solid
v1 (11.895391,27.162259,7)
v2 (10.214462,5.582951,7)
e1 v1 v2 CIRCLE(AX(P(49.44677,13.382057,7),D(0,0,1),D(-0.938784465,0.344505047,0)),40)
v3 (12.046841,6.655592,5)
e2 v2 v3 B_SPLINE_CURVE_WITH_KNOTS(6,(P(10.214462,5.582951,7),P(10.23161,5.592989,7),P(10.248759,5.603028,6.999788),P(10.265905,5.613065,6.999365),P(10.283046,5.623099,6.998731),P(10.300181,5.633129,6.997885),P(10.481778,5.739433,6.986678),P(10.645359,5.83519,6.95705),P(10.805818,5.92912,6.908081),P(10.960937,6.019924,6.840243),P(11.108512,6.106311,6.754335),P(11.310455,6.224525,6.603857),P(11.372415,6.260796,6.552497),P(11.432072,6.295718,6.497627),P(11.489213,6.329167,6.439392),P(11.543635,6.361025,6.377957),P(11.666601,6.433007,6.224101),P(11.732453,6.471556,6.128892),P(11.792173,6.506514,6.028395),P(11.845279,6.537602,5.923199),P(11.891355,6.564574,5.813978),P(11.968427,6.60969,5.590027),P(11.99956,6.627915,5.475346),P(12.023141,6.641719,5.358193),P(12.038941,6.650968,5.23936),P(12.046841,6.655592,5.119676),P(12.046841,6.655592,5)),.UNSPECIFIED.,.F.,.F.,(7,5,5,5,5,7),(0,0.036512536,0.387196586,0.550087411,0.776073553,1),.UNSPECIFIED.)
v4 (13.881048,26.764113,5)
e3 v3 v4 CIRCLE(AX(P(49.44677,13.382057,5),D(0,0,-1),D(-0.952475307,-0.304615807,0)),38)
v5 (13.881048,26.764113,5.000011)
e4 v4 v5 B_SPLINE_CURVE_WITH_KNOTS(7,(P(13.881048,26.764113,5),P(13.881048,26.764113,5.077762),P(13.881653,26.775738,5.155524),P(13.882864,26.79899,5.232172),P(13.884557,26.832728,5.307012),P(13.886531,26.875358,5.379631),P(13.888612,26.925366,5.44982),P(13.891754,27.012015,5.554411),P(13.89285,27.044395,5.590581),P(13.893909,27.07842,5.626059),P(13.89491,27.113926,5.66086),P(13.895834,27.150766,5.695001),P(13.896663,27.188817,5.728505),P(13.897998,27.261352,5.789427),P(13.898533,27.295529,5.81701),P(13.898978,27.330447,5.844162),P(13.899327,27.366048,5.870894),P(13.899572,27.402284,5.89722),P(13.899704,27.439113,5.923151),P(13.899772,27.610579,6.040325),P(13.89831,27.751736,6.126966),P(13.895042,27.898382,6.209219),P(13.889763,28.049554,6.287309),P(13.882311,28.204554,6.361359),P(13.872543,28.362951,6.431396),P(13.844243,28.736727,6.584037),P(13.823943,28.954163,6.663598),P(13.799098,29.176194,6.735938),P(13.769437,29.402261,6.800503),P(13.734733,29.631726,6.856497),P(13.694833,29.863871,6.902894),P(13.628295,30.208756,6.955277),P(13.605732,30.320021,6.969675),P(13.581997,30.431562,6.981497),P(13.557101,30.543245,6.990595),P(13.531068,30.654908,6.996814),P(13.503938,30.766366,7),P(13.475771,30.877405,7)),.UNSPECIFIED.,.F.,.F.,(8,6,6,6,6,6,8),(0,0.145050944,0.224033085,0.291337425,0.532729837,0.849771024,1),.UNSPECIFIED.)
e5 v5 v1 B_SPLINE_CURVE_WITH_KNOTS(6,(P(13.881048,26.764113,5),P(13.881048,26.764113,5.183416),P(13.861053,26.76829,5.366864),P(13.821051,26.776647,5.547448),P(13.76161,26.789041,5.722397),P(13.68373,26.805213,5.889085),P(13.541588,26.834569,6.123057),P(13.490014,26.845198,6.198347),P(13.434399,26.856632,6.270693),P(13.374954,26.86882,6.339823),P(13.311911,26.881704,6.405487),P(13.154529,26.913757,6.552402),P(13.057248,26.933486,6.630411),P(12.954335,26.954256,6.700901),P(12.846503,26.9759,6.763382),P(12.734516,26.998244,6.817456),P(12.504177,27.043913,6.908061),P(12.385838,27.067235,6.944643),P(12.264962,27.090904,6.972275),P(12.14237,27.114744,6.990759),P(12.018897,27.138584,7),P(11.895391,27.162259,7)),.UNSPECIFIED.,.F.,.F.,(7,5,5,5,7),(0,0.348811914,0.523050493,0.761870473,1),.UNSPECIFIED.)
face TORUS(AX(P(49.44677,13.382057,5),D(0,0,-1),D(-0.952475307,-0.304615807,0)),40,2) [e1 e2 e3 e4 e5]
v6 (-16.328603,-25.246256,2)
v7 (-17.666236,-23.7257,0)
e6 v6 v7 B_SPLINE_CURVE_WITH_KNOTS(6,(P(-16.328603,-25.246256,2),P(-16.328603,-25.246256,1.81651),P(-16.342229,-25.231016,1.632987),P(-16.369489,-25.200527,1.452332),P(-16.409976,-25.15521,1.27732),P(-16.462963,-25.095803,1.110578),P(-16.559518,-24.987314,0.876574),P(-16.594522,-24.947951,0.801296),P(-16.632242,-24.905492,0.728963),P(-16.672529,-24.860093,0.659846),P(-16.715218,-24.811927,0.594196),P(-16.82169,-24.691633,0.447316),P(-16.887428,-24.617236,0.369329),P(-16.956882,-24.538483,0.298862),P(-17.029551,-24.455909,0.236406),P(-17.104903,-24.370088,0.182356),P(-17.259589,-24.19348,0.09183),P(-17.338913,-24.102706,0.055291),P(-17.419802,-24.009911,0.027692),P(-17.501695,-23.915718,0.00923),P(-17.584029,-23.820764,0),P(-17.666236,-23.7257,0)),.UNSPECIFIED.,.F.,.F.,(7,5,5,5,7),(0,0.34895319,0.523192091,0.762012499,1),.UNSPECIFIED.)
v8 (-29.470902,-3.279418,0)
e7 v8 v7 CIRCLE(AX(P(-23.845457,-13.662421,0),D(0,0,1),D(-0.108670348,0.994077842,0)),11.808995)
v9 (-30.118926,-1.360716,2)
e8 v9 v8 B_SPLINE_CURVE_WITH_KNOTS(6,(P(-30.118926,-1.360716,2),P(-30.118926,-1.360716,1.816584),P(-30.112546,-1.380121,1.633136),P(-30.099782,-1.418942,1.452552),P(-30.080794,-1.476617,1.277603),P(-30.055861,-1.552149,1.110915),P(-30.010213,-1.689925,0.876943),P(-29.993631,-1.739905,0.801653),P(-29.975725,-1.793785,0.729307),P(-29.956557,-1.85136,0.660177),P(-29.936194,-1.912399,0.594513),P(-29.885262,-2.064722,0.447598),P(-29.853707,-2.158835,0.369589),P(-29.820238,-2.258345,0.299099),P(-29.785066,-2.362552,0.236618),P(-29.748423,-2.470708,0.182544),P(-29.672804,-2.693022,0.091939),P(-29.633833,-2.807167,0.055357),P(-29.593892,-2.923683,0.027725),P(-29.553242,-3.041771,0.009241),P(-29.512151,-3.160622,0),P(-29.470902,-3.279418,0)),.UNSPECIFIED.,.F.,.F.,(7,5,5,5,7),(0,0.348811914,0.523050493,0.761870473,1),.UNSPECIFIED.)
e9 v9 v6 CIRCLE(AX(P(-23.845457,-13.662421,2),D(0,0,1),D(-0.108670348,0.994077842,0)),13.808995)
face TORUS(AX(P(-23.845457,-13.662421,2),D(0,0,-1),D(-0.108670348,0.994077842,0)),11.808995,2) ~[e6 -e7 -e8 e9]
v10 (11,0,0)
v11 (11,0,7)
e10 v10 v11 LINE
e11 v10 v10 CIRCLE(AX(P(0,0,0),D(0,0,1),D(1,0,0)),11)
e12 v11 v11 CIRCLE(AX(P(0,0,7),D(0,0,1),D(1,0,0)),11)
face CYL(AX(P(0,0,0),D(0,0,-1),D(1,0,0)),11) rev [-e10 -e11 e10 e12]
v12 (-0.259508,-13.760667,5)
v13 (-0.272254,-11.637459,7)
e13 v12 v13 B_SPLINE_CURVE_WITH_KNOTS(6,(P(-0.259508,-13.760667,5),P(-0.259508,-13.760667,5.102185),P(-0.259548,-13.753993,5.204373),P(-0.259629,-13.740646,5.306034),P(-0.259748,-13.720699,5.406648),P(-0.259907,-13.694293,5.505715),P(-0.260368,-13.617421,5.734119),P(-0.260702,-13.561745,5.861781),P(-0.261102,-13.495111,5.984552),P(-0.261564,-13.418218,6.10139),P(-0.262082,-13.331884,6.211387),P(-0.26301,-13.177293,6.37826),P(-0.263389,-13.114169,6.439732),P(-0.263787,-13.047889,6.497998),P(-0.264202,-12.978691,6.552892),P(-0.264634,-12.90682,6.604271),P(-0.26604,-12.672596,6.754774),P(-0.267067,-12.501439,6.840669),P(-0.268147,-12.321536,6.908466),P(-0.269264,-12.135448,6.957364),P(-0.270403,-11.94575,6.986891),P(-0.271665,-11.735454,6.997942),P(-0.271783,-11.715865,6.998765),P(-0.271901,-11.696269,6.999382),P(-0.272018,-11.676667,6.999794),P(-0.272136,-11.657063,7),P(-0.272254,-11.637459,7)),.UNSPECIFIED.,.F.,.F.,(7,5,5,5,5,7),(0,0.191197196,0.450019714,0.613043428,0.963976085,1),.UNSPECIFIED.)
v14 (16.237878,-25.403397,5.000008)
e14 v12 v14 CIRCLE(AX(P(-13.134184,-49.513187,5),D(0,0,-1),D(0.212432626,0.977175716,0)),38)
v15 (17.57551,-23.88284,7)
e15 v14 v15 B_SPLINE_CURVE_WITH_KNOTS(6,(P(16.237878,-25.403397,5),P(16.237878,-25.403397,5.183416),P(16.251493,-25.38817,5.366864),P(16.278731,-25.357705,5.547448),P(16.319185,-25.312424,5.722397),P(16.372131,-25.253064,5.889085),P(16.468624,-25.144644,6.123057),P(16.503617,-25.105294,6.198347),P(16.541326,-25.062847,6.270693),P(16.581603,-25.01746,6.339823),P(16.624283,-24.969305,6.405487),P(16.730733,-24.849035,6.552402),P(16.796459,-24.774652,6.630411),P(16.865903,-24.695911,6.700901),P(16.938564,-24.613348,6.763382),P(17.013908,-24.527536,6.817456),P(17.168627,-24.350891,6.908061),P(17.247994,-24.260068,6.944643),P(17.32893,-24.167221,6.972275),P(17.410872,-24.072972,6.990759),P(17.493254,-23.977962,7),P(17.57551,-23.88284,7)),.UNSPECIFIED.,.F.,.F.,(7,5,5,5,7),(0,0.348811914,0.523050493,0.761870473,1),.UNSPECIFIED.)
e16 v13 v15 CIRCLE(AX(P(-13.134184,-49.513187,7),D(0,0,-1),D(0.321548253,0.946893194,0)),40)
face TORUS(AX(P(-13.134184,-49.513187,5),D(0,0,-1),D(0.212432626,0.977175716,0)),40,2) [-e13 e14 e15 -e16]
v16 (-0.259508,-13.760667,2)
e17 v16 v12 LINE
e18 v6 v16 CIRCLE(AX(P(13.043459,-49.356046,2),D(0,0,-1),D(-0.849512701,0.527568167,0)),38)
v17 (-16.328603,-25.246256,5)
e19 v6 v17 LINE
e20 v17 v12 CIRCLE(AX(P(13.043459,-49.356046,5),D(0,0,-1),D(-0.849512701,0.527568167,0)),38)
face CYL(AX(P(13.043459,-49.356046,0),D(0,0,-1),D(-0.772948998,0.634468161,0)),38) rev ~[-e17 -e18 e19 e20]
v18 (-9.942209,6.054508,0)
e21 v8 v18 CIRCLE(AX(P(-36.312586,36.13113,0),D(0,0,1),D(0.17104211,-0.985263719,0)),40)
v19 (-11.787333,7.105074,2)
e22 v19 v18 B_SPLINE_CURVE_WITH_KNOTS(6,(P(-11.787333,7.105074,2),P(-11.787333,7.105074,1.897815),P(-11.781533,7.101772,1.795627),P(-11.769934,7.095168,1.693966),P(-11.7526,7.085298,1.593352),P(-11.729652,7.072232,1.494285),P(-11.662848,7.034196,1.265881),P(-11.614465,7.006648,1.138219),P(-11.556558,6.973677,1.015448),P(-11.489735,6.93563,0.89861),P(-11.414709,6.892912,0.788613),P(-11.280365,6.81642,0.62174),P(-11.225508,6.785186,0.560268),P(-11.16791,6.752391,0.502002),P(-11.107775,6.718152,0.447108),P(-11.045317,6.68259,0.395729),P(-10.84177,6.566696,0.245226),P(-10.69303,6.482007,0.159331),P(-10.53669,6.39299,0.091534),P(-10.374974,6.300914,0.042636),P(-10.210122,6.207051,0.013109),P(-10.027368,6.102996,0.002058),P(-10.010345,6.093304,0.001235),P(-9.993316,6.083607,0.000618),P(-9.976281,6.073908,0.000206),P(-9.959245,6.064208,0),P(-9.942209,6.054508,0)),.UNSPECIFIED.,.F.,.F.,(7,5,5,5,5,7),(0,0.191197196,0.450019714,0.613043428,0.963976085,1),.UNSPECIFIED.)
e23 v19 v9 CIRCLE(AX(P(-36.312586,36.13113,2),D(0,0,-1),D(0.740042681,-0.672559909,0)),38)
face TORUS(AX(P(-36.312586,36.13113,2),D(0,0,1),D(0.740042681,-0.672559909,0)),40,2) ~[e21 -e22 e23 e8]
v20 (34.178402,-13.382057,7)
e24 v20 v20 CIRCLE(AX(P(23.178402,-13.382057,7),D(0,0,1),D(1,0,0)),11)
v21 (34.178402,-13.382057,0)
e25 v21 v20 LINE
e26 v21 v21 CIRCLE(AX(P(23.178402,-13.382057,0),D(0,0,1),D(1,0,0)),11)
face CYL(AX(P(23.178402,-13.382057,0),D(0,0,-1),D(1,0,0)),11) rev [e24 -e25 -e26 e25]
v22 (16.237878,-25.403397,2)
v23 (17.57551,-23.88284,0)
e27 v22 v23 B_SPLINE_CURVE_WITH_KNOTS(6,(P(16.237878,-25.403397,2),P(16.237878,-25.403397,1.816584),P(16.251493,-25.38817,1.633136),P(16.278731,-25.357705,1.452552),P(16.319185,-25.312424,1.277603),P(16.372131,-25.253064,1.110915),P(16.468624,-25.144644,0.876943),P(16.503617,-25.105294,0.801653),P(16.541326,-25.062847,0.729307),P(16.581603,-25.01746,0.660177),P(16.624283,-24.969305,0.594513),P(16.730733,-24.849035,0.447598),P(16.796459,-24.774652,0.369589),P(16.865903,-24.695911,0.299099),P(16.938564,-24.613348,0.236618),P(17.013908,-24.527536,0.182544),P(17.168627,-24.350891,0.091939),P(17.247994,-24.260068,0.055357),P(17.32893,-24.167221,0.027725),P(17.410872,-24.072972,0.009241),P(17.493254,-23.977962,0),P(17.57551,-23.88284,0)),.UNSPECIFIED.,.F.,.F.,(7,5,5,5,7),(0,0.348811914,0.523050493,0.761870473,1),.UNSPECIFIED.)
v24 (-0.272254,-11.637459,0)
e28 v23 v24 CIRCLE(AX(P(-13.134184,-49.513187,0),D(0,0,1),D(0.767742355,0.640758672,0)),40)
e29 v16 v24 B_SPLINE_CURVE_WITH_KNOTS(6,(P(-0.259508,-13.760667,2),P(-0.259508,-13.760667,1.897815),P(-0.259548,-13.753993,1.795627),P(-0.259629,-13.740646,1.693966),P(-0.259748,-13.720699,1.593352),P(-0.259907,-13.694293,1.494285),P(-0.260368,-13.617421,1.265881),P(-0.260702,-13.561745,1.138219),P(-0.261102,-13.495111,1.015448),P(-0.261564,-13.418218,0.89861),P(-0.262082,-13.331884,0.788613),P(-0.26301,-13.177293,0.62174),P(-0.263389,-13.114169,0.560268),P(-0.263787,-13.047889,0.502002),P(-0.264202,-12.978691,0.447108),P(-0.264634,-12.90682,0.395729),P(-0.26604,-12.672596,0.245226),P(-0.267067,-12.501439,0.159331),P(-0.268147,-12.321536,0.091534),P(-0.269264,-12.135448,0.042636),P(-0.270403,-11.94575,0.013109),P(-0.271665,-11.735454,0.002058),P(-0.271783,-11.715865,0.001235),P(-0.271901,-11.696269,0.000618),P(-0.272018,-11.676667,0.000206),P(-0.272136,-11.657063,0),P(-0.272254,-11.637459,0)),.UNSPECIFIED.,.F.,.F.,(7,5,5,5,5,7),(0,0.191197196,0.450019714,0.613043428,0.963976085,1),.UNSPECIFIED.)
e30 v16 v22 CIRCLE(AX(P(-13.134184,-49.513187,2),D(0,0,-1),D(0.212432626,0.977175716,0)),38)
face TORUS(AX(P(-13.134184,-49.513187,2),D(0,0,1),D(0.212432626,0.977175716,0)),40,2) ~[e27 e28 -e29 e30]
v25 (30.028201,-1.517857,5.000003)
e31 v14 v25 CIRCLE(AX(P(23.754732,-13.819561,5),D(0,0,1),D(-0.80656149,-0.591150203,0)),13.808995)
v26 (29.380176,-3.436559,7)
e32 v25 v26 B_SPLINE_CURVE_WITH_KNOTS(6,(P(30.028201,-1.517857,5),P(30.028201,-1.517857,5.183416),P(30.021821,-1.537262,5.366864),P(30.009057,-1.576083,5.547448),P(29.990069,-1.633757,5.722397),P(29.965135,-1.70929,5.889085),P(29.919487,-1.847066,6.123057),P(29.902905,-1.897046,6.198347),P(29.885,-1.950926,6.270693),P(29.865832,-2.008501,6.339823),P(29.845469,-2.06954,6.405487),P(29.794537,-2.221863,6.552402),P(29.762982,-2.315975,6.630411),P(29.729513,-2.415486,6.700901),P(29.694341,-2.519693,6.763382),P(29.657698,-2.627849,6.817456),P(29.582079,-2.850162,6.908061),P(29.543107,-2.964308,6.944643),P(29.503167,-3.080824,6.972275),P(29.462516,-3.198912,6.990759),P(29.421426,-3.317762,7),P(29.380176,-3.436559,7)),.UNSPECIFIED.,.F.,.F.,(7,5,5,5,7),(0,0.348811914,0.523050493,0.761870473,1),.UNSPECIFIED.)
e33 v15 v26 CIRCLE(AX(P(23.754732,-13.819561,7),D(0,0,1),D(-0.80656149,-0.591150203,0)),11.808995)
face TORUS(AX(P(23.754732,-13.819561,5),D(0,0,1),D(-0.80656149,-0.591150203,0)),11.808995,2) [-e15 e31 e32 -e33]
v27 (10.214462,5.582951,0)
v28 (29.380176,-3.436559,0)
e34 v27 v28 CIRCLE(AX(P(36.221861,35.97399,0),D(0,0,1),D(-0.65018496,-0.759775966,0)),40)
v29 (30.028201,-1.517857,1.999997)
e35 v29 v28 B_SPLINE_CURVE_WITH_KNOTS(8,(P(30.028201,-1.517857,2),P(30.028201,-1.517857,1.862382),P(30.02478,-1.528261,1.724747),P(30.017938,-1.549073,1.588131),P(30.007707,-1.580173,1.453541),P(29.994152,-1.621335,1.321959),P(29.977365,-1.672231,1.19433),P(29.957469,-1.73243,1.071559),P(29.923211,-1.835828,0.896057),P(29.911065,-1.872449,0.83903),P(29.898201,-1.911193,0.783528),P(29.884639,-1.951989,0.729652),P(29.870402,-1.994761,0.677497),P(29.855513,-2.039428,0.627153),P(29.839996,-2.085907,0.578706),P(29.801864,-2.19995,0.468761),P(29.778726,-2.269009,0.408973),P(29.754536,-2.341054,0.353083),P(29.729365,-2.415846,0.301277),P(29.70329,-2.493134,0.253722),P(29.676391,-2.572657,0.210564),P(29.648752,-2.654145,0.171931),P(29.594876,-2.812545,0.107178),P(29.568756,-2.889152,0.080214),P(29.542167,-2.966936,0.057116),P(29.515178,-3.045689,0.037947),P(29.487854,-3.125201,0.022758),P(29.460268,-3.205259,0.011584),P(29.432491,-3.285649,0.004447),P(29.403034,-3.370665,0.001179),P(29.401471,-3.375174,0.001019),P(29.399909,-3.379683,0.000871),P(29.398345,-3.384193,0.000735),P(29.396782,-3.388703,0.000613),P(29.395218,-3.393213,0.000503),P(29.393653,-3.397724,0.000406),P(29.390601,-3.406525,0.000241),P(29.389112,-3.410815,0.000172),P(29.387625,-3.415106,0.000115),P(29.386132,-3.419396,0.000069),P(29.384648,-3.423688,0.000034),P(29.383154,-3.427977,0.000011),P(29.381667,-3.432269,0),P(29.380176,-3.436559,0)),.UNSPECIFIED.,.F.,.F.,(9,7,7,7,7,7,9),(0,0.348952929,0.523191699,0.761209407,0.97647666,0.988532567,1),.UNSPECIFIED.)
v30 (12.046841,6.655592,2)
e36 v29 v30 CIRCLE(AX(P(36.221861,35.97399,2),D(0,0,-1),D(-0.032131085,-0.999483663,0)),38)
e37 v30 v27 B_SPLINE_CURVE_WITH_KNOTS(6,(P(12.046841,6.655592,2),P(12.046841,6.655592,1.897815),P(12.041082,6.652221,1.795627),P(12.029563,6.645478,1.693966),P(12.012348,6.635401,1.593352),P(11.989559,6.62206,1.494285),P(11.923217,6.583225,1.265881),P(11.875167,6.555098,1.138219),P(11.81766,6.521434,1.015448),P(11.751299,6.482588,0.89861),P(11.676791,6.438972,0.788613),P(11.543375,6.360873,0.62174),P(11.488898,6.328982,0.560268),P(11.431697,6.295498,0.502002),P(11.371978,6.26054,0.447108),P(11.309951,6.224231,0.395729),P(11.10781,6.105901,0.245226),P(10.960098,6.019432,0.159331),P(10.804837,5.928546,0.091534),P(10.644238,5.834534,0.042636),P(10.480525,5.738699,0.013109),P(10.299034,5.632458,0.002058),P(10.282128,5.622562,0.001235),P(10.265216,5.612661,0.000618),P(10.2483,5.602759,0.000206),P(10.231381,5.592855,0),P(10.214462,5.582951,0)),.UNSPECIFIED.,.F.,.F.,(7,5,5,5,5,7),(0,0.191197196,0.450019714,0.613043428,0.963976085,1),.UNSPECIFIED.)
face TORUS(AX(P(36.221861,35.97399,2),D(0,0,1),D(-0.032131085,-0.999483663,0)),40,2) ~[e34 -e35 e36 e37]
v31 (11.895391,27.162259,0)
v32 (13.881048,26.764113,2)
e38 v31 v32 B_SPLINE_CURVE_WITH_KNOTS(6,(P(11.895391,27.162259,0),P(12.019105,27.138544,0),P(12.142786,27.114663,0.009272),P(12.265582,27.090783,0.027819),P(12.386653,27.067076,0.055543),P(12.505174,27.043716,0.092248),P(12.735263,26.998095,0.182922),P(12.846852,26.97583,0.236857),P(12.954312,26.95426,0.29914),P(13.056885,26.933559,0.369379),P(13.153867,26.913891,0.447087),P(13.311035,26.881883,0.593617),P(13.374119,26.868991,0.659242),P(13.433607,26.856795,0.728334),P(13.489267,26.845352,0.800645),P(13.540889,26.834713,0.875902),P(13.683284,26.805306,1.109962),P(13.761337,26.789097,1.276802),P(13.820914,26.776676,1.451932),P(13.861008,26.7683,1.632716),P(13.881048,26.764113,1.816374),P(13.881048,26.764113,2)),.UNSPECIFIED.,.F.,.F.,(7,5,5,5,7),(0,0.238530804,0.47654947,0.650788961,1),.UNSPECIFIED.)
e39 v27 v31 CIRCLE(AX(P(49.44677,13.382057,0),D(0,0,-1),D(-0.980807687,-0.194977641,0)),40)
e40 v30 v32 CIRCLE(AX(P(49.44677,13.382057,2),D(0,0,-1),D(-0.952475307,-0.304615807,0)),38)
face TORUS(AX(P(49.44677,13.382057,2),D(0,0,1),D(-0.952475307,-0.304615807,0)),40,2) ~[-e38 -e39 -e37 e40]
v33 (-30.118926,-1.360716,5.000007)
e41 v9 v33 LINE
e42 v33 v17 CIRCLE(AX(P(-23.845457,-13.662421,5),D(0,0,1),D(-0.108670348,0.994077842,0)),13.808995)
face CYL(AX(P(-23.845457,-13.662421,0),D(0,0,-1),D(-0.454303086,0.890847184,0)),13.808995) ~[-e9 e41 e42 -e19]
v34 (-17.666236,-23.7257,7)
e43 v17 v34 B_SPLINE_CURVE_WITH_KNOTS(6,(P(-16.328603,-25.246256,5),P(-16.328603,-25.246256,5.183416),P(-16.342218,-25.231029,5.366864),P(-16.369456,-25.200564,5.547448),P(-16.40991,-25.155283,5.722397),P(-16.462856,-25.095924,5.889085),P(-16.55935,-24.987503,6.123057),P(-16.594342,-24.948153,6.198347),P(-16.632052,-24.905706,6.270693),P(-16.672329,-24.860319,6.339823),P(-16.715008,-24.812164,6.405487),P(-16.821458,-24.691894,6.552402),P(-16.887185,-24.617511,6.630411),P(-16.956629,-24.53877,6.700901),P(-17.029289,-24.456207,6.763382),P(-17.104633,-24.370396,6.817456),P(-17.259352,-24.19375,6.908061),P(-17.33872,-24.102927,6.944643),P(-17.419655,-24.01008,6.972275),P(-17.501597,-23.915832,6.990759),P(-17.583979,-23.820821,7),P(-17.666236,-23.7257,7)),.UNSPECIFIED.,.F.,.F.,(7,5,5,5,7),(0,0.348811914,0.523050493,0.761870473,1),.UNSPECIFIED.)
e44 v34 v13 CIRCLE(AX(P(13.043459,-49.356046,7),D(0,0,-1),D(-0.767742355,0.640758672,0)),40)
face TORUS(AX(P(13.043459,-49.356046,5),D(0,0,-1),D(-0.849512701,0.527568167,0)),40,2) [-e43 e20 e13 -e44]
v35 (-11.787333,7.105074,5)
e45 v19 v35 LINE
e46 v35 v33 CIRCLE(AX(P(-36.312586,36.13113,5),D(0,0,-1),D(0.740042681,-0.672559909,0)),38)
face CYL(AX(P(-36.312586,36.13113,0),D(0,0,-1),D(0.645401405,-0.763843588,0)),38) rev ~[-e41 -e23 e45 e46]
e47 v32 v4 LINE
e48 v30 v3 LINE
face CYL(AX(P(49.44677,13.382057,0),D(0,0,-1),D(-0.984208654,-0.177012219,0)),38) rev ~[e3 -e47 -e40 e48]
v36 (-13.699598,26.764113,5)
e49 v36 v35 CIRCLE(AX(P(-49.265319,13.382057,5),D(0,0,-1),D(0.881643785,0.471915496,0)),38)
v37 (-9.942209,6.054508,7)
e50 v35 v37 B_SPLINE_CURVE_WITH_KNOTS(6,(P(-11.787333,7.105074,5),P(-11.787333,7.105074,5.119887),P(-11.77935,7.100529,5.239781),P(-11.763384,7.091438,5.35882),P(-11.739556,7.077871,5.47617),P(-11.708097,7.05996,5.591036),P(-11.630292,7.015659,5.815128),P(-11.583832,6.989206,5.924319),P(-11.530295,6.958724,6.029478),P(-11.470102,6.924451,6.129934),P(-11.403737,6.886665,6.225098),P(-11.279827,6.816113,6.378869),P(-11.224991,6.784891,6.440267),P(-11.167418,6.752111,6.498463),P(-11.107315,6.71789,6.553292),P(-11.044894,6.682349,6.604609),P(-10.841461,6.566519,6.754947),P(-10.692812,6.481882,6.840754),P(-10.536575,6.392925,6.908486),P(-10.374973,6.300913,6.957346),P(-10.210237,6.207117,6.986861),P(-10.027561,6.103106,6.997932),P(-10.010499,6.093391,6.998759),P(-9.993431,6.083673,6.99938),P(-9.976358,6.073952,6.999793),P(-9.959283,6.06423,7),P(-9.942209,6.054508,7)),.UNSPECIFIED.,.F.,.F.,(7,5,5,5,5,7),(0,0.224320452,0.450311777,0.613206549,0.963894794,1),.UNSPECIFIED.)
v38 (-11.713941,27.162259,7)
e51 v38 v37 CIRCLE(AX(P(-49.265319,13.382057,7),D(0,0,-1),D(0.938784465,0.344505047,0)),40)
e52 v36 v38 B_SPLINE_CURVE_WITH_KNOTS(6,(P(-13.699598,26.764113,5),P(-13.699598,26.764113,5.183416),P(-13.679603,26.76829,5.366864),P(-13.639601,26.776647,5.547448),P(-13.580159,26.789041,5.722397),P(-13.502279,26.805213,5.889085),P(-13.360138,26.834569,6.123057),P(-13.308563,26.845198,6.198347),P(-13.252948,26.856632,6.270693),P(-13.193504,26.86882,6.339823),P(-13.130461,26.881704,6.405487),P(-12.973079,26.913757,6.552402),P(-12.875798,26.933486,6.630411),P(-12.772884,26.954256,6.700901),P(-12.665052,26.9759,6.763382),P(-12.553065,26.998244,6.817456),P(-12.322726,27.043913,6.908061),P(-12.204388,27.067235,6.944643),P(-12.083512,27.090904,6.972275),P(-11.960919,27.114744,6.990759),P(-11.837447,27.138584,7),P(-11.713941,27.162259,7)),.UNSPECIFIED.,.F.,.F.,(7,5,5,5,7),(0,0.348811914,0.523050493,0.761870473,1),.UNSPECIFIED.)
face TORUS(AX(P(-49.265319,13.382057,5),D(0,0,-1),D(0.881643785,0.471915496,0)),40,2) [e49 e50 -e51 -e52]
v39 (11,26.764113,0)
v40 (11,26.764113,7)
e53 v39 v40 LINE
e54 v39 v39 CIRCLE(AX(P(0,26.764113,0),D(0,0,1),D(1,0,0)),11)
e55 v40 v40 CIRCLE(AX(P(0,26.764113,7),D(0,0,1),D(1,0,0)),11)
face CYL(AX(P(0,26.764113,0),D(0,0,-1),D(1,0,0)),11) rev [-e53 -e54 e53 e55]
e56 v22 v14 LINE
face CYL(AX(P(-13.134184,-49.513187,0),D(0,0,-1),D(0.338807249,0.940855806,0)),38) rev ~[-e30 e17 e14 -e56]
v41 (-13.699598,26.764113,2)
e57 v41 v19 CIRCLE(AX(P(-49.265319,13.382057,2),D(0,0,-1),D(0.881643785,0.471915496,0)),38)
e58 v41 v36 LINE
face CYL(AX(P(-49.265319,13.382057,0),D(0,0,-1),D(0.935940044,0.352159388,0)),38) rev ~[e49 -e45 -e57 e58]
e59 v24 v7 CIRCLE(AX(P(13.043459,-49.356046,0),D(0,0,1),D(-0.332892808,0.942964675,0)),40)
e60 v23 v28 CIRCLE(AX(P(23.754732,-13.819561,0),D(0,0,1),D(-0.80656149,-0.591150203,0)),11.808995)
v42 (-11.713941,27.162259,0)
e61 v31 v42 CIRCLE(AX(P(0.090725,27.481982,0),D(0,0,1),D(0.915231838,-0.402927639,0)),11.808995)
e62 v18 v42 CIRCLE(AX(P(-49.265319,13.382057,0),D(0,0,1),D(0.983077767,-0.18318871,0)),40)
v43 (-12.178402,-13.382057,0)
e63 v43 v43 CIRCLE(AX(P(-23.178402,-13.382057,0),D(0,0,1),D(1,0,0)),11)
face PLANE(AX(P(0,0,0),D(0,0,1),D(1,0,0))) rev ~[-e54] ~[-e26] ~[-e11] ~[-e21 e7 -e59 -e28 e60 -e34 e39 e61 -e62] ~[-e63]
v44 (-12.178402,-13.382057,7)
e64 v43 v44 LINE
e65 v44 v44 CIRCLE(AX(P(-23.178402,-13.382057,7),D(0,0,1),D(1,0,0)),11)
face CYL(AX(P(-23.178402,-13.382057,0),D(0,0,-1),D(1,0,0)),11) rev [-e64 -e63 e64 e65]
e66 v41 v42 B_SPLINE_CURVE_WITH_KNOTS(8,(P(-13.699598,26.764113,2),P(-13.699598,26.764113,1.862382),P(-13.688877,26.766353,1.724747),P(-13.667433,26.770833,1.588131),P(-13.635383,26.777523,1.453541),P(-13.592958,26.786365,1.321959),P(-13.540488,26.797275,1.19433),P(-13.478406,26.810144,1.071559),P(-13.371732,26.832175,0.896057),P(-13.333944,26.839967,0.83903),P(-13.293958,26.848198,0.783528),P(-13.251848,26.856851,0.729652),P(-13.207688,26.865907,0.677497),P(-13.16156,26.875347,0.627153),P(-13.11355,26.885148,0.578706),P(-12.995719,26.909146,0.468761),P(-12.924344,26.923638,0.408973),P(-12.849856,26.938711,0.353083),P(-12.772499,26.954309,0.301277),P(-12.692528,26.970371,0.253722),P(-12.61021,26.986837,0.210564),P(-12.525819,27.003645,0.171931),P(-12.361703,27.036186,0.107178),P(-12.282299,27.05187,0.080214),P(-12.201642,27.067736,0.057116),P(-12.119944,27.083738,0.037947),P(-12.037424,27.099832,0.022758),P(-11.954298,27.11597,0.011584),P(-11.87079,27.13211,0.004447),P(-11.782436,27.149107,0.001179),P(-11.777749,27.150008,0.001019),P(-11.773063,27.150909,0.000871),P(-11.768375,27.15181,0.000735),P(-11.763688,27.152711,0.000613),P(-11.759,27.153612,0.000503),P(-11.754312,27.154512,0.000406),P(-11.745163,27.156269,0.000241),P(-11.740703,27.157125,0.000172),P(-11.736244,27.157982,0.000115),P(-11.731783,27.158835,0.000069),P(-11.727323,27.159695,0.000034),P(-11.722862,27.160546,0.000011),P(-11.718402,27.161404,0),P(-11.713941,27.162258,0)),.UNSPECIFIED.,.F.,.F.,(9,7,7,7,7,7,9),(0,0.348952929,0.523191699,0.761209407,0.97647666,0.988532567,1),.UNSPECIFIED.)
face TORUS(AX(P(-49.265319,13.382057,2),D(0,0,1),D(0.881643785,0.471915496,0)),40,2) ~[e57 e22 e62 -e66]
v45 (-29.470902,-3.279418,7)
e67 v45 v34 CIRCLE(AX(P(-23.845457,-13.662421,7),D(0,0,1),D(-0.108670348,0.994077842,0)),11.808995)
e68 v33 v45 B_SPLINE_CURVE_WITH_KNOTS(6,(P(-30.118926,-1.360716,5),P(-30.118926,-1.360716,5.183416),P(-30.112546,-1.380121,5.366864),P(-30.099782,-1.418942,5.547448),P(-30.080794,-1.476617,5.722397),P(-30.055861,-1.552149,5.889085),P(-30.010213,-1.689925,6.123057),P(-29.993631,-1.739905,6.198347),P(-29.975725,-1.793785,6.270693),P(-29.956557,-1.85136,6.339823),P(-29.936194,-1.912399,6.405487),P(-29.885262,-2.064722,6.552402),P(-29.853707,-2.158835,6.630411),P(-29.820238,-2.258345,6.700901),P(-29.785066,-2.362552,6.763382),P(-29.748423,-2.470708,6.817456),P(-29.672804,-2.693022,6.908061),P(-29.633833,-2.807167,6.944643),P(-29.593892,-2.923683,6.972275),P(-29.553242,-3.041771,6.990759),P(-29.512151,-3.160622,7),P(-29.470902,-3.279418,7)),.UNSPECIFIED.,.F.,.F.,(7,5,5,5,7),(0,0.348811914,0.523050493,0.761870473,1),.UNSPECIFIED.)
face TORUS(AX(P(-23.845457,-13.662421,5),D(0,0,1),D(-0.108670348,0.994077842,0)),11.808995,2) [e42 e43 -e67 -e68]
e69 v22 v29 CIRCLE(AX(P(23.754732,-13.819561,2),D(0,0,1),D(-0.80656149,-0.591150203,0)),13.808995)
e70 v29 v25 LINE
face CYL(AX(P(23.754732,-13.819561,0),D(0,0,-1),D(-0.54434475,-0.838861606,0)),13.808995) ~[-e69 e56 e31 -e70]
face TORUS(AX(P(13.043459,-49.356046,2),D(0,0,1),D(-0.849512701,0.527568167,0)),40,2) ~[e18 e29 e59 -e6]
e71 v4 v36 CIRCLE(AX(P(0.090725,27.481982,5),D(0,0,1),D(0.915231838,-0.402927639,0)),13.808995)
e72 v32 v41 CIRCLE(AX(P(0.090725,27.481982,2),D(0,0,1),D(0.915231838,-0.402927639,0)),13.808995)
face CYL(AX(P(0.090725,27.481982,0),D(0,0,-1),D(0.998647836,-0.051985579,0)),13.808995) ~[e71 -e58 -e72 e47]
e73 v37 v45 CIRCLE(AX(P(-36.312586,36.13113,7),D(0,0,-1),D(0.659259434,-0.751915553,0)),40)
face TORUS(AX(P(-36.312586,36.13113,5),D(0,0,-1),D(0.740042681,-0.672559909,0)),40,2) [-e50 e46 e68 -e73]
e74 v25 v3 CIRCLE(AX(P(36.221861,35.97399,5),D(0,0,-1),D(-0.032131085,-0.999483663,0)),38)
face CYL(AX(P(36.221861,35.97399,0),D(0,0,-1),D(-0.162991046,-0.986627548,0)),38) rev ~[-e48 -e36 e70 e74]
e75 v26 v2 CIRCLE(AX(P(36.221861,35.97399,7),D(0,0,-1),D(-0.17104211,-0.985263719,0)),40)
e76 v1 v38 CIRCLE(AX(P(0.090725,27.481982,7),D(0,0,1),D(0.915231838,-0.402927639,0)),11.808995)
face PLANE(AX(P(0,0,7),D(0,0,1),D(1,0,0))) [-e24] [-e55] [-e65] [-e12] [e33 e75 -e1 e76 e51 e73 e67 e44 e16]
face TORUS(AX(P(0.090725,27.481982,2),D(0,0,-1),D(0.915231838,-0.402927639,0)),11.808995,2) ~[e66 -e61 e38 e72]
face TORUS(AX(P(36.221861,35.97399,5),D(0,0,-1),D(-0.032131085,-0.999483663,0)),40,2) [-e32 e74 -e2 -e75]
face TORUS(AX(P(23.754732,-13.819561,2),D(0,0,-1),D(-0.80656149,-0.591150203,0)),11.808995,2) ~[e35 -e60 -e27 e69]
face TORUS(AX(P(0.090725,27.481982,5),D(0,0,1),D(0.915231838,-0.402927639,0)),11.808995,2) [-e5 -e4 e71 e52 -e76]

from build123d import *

# Parameters (mm, degrees)
F0_R         = 11
F1_DEPTH     = 7
F2_T3_ANGLE  = 45.2058743493
F2_S4_R      = 38
F2_T5_DEPTH  = 19
F2_T8_ANGLE  = 227.522654694
F2_T11_ANGLE = 45.8937746322
F2_S12_R     = 38
F2_T13_DEPTH = 20
F2_T16_ANGLE = 45.2058743493
F2_S17_R     = 38
F2_T18_DEPTH = 20
F2_T21_ANGLE = 227.522654694
F2_T24_ANGLE = 45.8937746322
F2_S25_R     = 38
F2_T26_DEPTH = 21
F2_T29_ANGLE = 45.2058743493
F2_S30_R     = 38
F2_T31_DEPTH = 21
F2_T34_ANGLE = 227.522654694
F2_T37_ANGLE = 45.8937746322
F2_S38_R     = 38
F2_T39_DEPTH = 20
F2_T43_ANGLE = 45.2058743493
F2_S44_R     = 38
F2_T45_DEPTH = 19
F2_T48_ANGLE = 45.8937746322
F2_S49_R     = 38
F2_T50_DEPTH = 20
F2_T55_ANGLE = 45.8937746322
F2_S56_R     = 38
F2_T57_DEPTH = 20
F2_T60_ANGLE = 45.2058743493
F2_S61_R     = 38
F2_T62_DEPTH = 20
F2_T67_ANGLE = 45.2058743493
F2_S68_R     = 38
F2_T69_DEPTH = 21
F2_T72_ANGLE = 45.8937746322
F2_S73_R     = 38
F2_T74_DEPTH = 21
F3_T3_ANGLE  = 227.522654694
F3_T6_ANGLE  = 45.2058743493
F3_S7_R      = 38
F3_T8_DEPTH  = 19
F3_T11_ANGLE = 45.8937746322
F3_S12_R     = 38
F3_T13_DEPTH = 20
F3_T16_ANGLE = 227.522654694
F3_T19_ANGLE = 45.2058743493
F3_S20_R     = 38
F3_T21_DEPTH = 21
F3_T24_ANGLE = 45.8937746322
F3_S25_R     = 38
F3_T26_DEPTH = 21
F3_T29_ANGLE = 227.522654694
F3_T32_ANGLE = 45.2058743493
F3_S33_R     = 38
F3_T34_DEPTH = 20
F3_T37_ANGLE = 45.8937746322
F3_S38_R     = 38
F3_T39_DEPTH = 20
F3_T43_ANGLE = 45.8937746322
F3_S44_R     = 38
F3_T45_DEPTH = 20
F3_T48_ANGLE = 45.2058743493
F3_S49_R     = 38
F3_T50_DEPTH = 19
F3_T55_ANGLE = 45.8937746322
F3_S56_R     = 38
F3_T57_DEPTH = 21
F3_T60_ANGLE = 45.2058743493
F3_S61_R     = 38
F3_T62_DEPTH = 21
F3_T67_ANGLE = 45.8937746322
F3_S68_R     = 38
F3_T69_DEPTH = 20
F3_T72_ANGLE = 45.2058743493
F3_S73_R     = 38
F3_T74_DEPTH = 20


# Not quite as in the source:
# - a fillet or chamfer that OpenCascade refuses, or shapes differently, is made with other operations: its cross-section is extruded or revolved along the edge and cut away or added


with BuildPart() as f1:
    # F0 (on Top) → F1 (new body)
    with BuildSketch(Plane.XY):
        with BuildLine():
            ThreePointArc((12.0468410067, 6.6555924166), (11.6038749685, 16.833912258), (13.8810481876, 26.764113456))
            ThreePointArc((13.8810481876, 26.764113456), (0.0907252543, 41.2909770134), (-13.6995976791, 26.764113456))
            ThreePointArc((-13.6995976791, 26.764113456), (-11.4438268991, 17.0610116136), (-11.7873326133, 7.1050741388))
            ThreePointArc((-11.7873326133, 7.1050741388), (-20.3805331447, 1.6322943761), (-30.1189262565, -1.3607163664))
            ThreePointArc((-30.1189262565, -1.3607163664), (-35.8043976678, -20.5669181317), (-16.3286033231, -25.2462563397))
            ThreePointArc((-16.3286033231, -25.2462563397), (-9.053356022, -18.4411506179), (-0.2595083933, -13.7606665554))
            ThreePointArc((-0.2595083933, -13.7606665554), (8.7766581762, -18.466206634), (16.2378780689, -25.4033970896))
            ThreePointArc((16.2378780689, -25.4033970896), (35.7136724135, -20.7240588817), (30.0282010022, -1.5178571163))
            ThreePointArc((30.0282010022, -1.5178571163), (20.4971829212, 1.3801390044), (12.0468410067, 6.6555924166))
        make_face()
        with Locations((-23.1784021627, -13.382056728)):
            Circle(F0_R, mode=Mode.SUBTRACT)
        with Locations((23.1784021627, -13.382056728)):
            Circle(F0_R, mode=Mode.SUBTRACT)
        Circle(F0_R, mode=Mode.SUBTRACT)
        with Locations((0, 26.764113456)):
            Circle(F0_R, mode=Mode.SUBTRACT)
    extrude(amount=F1_DEPTH)

    # F2: fillet of radius 2 on 9 edges, made by hand


with BuildPart() as f2_tool1:
    # F2_s2 → F2_t3 (revolve)
    with BuildSketch(Plane(origin=(-16.5393520653, 30.8992120032, 0), x_dir=(0, 0, 1), z_dir=(-0.4719154962, 0.8816437855, 0))):
        with BuildLine():
            ThreePointArc((5, 0.8807372995), (6.4142135624, 1.4665237371), (7, 2.8807372995))
            Line((7, 2.8807372995), (7, 0.8807372995))
            Line((7, 0.8807372995), (5, 0.8807372995))
        make_face()
    revolve(axis=Axis((-49.2653193466, 13.382056728, 7), (0, 0, -1)), revolution_arc=F2_T3_ANGLE)

    # F2_s4 → F2_t5 (intersect, symmetric)
    with BuildSketch(Plane.XY.offset(5.3)):
        with Locations((-36.3125860089, 36.1311304656)):
            Circle(F2_S4_R)
    extrude(amount=F2_T5_DEPTH, both=True, mode=Mode.INTERSECT)


with BuildPart() as f2_tool6:
    # F2_s7 → F2_t8 (revolve)
    with BuildSketch(Plane(origin=(10.1493203818, 23.0537204739, 0), x_dir=(0, 0, 1), z_dir=(-0.4029276386, -0.9152318384, 0))):
        with BuildLine():
            ThreePointArc((5, -2.8187794742), (6.4142135624, -2.2329930365), (7, -0.8187794742))
            Line((7, -0.8187794742), (7, -2.8187794742))
            Line((7, -2.8187794742), (5, -2.8187794742))
        make_face()
    revolve(axis=Axis((0.0907252543, 27.4819820491, 7), (0, 0, 1)), revolution_arc=F2_T8_ANGLE)


with BuildPart() as f2_tool9:
    # F2_s10 → F2_t11 (revolve)
    with BuildSketch(Plane(origin=(0.7055478119, -2.2061129258, 0), x_dir=(0, 0, 1), z_dir=(0.3046158068, -0.9524753069, 0))):
        with BuildLine():
            ThreePointArc((5, -13.1732132997), (6.4142135624, -12.5874268621), (7, -11.1732132997))
            Line((7, -11.1732132997), (7, -13.1732132997))
            Line((7, -13.1732132997), (5, -13.1732132997))
        make_face()
    revolve(axis=Axis((49.4467698551, 13.382056728, 7), (0, 0, -1)), revolution_arc=F2_T11_ANGLE)

    # F2_s12 → F2_t13 (intersect, symmetric)
    with BuildSketch(Plane.XY.offset(5.3)):
        with Locations((36.2218607546, 35.9739897157)):
            Circle(F2_S12_R)
    extrude(amount=F2_T13_DEPTH, both=True, mode=Mode.INTERSECT)


with BuildPart() as f2_tool14:
    # F2_s15 → F2_t16 (revolve)
    with BuildSketch(Plane(origin=(35.0291785844, -1.1261069509, 0), x_dir=(0, 0, 1), z_dir=(0.9994836634, -0.0321310846, 0))):
        with BuildLine():
            ThreePointArc((5, 0.8807372995), (6.4142135624, 1.4665237371), (7, 2.8807372995))
            Line((7, 2.8807372995), (7, 0.8807372995))
            Line((7, 0.8807372995), (5, 0.8807372995))
        make_face()
    revolve(axis=Axis((36.2218607546, 35.9739897157, 7), (0, 0, -1)), revolution_arc=F2_T16_ANGLE)

    # F2_s17 → F2_t18 (intersect, symmetric)
    with BuildSketch(Plane.XY.offset(5.3)):
        with Locations((49.4467698551, 13.382056728)):
            Circle(F2_S17_R)
    extrude(amount=F2_T18_DEPTH, both=True, mode=Mode.INTERSECT)


with BuildPart() as f2_tool19:
    # F2_s20 → F2_t21 (revolve)
    with BuildSketch(Plane(origin=(14.8904473912, -20.3164295188, 0), x_dir=(0, 0, 1), z_dir=(-0.5911502031, 0.8065614901, 0))):
        with BuildLine():
            ThreePointArc((5, -2.8187794742), (6.4142135624, -2.2329930365), (7, -0.8187794742))
            Line((7, -0.8187794742), (7, -2.8187794742))
            Line((7, -2.8187794742), (5, -2.8187794742))
        make_face()
    revolve(axis=Axis((23.7547319738, -13.8195613995, 7), (0, 0, 1)), revolution_arc=F2_T21_ANGLE)


with BuildPart() as f2_tool22:
    # F2_s23 → F2_t24 (revolve)
    with BuildSketch(Plane(origin=(-2.2633237433, 0.4920341342, 0), x_dir=(0, 0, 1), z_dir=(-0.9771757156, 0.2124326264, 0))):
        with BuildLine():
            ThreePointArc((5, -13.1732132997), (6.4142135624, -12.5874268621), (7, -11.1732132997))
            Line((7, -11.1732132997), (7, -13.1732132997))
            Line((7, -13.1732132997), (5, -13.1732132997))
        make_face()
    revolve(axis=Axis((-13.1341838462, -49.5131871936, 7), (0, 0, -1)), revolution_arc=F2_T24_ANGLE)

    # F2_s25 → F2_t26 (intersect, symmetric)
    with BuildSketch(Plane.XY.offset(5.3)):
        with Locations((13.0434585919, -49.3560464437)):
            Circle(F2_S25_R)
    extrude(amount=F2_T26_DEPTH, both=True, mode=Mode.INTERSECT)


with BuildPart() as f2_tool27:
    # F2_s28 → F2_t29 (revolve)
    with BuildSketch(Plane(origin=(-18.4898265191, -29.7731050523, 0), x_dir=(0, 0, 1), z_dir=(-0.5275681672, -0.8495127009, 0))):
        with BuildLine():
            ThreePointArc((5, 0.8807372995), (6.4142135624, 1.4665237371), (7, 2.8807372995))
            Line((7, 2.8807372995), (7, 0.8807372995))
            Line((7, 0.8807372995), (5, 0.8807372995))
        make_face()
    revolve(axis=Axis((13.0434585919, -49.3560464437, 7), (0, 0, -1)), revolution_arc=F2_T29_ANGLE)

    # F2_s30 → F2_t31 (intersect, symmetric)
    with BuildSketch(Plane.XY.offset(5.3)):
        with Locations((-13.1341838462, -49.5131871936)):
            Circle(F2_S30_R)
    extrude(amount=F2_T31_DEPTH, both=True, mode=Mode.INTERSECT)


with BuildPart() as f2_tool32:
    # F2_s33 → F2_t34 (revolve)
    with BuildSketch(Plane(origin=(-25.0397677731, -2.7372909551, 0), x_dir=(0, 0, 1), z_dir=(0.9940778417, 0.1086703483, 0))):
        with BuildLine():
            ThreePointArc((5, -2.8187794742), (6.4142135624, -2.2329930365), (7, -0.8187794742))
            Line((7, -0.8187794742), (7, -2.8187794742))
            Line((7, -2.8187794742), (5, -2.8187794742))
        make_face()
    revolve(axis=Axis((-23.845457228, -13.6624206496, 7), (0, 0, 1)), revolution_arc=F2_T34_ANGLE)


with BuildPart() as f2_tool35:
    # F2_s36 → F2_t37 (revolve)
    with BuildSketch(Plane(origin=(1.5577759314, 1.7140787916, 0), x_dir=(0, 0, 1), z_dir=(0.6725599089, 0.7400426805, 0))):
        with BuildLine():
            ThreePointArc((5, -13.1732132997), (6.4142135624, -12.5874268621), (7, -11.1732132997))
            Line((7, -11.1732132997), (7, -13.1732132997))
            Line((7, -13.1732132997), (5, -13.1732132997))
        make_face()
    revolve(axis=Axis((-36.3125860089, 36.1311304656, 7), (0, 0, -1)), revolution_arc=F2_T37_ANGLE)

    # F2_s38 → F2_t39 (intersect, symmetric)
    with BuildSketch(Plane.XY.offset(6)):
        with Locations((-49.2653193466, 13.382056728)):
            Circle(F2_S38_R)
    extrude(amount=F2_T39_DEPTH, both=True, mode=Mode.INTERSECT)


with BuildPart() as f2_tool41:
    # F2_s42 → F2_t43 (revolve)
    with BuildSketch(Plane(origin=(-16.5393520653, 30.8992120032, 0), x_dir=(0, 0, 1), z_dir=(-0.4719154962, 0.8816437855, 0))):
        with BuildLine():
            ThreePointArc((5, 0.8807372995), (6.4142135624, 1.4665237371), (7, 2.8807372995))
            Line((7, 2.8807372995), (7, 0.8807372995))
            Line((7, 0.8807372995), (5, 0.8807372995))
        make_face()
    revolve(axis=Axis((-49.2653193466, 13.382056728, 7), (0, 0, -1)), revolution_arc=F2_T43_ANGLE)

    # F2_s44 → F2_t45 (cut, symmetric)
    with BuildSketch(Plane.XY.offset(5.3)):
        with Locations((-36.3125860089, 36.1311304656)):
            Circle(F2_S44_R)
    extrude(amount=F2_T45_DEPTH, both=True, mode=Mode.SUBTRACT)


with BuildPart() as f2_tool46:
    # F2_s47 → F2_t48 (revolve)
    with BuildSketch(Plane(origin=(1.5577759314, 1.7140787916, 0), x_dir=(0, 0, 1), z_dir=(0.6725599089, 0.7400426805, 0))):
        with BuildLine():
            ThreePointArc((5, -13.1732132997), (6.4142135624, -12.5874268621), (7, -11.1732132997))
            Line((7, -11.1732132997), (7, -13.1732132997))
            Line((7, -13.1732132997), (5, -13.1732132997))
        make_face()
    revolve(axis=Axis((-36.3125860089, 36.1311304656, 7), (0, 0, -1)), revolution_arc=F2_T48_ANGLE)

    # F2_s49 → F2_t50 (cut, symmetric)
    with BuildSketch(Plane.XY.offset(6)):
        with Locations((-49.2653193466, 13.382056728)):
            Circle(F2_S49_R)
    extrude(amount=F2_T50_DEPTH, both=True, mode=Mode.SUBTRACT)


with BuildPart() as f2_tool41_1:
    add(f2_tool41.part)

    # F2_t51: intersect F2_tool46
    add(f2_tool46.part, mode=Mode.INTERSECT)


with BuildPart() as f2_tool53:
    # F2_s54 → F2_t55 (revolve)
    with BuildSketch(Plane(origin=(0.7055478119, -2.2061129258, 0), x_dir=(0, 0, 1), z_dir=(0.3046158068, -0.9524753069, 0))):
        with BuildLine():
            ThreePointArc((5, -13.1732132997), (6.4142135624, -12.5874268621), (7, -11.1732132997))
            Line((7, -11.1732132997), (7, -13.1732132997))
            Line((7, -13.1732132997), (5, -13.1732132997))
        make_face()
    revolve(axis=Axis((49.4467698551, 13.382056728, 7), (0, 0, -1)), revolution_arc=F2_T55_ANGLE)

    # F2_s56 → F2_t57 (cut, symmetric)
    with BuildSketch(Plane.XY.offset(5.3)):
        with Locations((36.2218607546, 35.9739897157)):
            Circle(F2_S56_R)
    extrude(amount=F2_T57_DEPTH, both=True, mode=Mode.SUBTRACT)


with BuildPart() as f2_tool58:
    # F2_s59 → F2_t60 (revolve)
    with BuildSketch(Plane(origin=(35.0291785844, -1.1261069509, 0), x_dir=(0, 0, 1), z_dir=(0.9994836634, -0.0321310846, 0))):
        with BuildLine():
            ThreePointArc((5, 0.8807372995), (6.4142135624, 1.4665237371), (7, 2.8807372995))
            Line((7, 2.8807372995), (7, 0.8807372995))
            Line((7, 0.8807372995), (5, 0.8807372995))
        make_face()
    revolve(axis=Axis((36.2218607546, 35.9739897157, 7), (0, 0, -1)), revolution_arc=F2_T60_ANGLE)

    # F2_s61 → F2_t62 (cut, symmetric)
    with BuildSketch(Plane.XY.offset(5.3)):
        with Locations((49.4467698551, 13.382056728)):
            Circle(F2_S61_R)
    extrude(amount=F2_T62_DEPTH, both=True, mode=Mode.SUBTRACT)


with BuildPart() as f2_tool53_1:
    add(f2_tool53.part)

    # F2_t63: intersect F2_tool58
    add(f2_tool58.part, mode=Mode.INTERSECT)


with BuildPart() as f2_tool65:
    # F2_s66 → F2_t67 (revolve)
    with BuildSketch(Plane(origin=(-18.4898265191, -29.7731050523, 0), x_dir=(0, 0, 1), z_dir=(-0.5275681672, -0.8495127009, 0))):
        with BuildLine():
            ThreePointArc((5, 0.8807372995), (6.4142135624, 1.4665237371), (7, 2.8807372995))
            Line((7, 2.8807372995), (7, 0.8807372995))
            Line((7, 0.8807372995), (5, 0.8807372995))
        make_face()
    revolve(axis=Axis((13.0434585919, -49.3560464437, 7), (0, 0, -1)), revolution_arc=F2_T67_ANGLE)

    # F2_s68 → F2_t69 (cut, symmetric)
    with BuildSketch(Plane.XY.offset(5.3)):
        with Locations((-13.1341838462, -49.5131871936)):
            Circle(F2_S68_R)
    extrude(amount=F2_T69_DEPTH, both=True, mode=Mode.SUBTRACT)


with BuildPart() as f2_tool70:
    # F2_s71 → F2_t72 (revolve)
    with BuildSketch(Plane(origin=(-2.2633237433, 0.4920341342, 0), x_dir=(0, 0, 1), z_dir=(-0.9771757156, 0.2124326264, 0))):
        with BuildLine():
            ThreePointArc((5, -13.1732132997), (6.4142135624, -12.5874268621), (7, -11.1732132997))
            Line((7, -11.1732132997), (7, -13.1732132997))
            Line((7, -13.1732132997), (5, -13.1732132997))
        make_face()
    revolve(axis=Axis((-13.1341838462, -49.5131871936, 7), (0, 0, -1)), revolution_arc=F2_T72_ANGLE)

    # F2_s73 → F2_t74 (cut, symmetric)
    with BuildSketch(Plane.XY.offset(5.3)):
        with Locations((13.0434585919, -49.3560464437)):
            Circle(F2_S73_R)
    extrude(amount=F2_T74_DEPTH, both=True, mode=Mode.SUBTRACT)


with BuildPart() as f2_tool65_1:
    add(f2_tool65.part)

    # F2_t75: intersect F2_tool70
    add(f2_tool70.part, mode=Mode.INTERSECT)


with BuildPart() as f1_1:
    add(f1.part)

    # F2_t76: cut F2_tool1, F2_tool6, F2_tool9, F2_tool14, F2_tool19, F2_tool22, F2_tool27, F2_tool32, F2_tool35, F2_tool41, F2_tool53, F2_tool65
    add([f2_tool1.part, f2_tool6.part, f2_tool9.part, f2_tool14.part, f2_tool19.part, f2_tool22.part, f2_tool27.part, f2_tool32.part, f2_tool35.part, f2_tool41_1.part, f2_tool53_1.part, f2_tool65_1.part], mode=Mode.SUBTRACT)

    # F3: fillet of radius 2 on 9 edges, made by hand


with BuildPart() as f3_tool1:
    # F3_s2 → F3_t3 (revolve)
    with BuildSketch(Plane(origin=(10.1493203818, 23.0537204739, 0), x_dir=(0, 0, 1), z_dir=(-0.4029276386, -0.9152318384, 0))):
        with BuildLine():
            ThreePointArc((2, -2.8187794742), (0.5857864376, -2.2329930365), (0, -0.8187794742))
            Line((0, -0.8187794742), (0, -2.8187794742))
            Line((0, -2.8187794742), (2, -2.8187794742))
        make_face()
    revolve(axis=Axis((0.0907252543, 27.4819820491, 0), (0, 0, 1)), revolution_arc=F3_T3_ANGLE)


with BuildPart() as f3_tool4:
    # F3_s5 → F3_t6 (revolve)
    with BuildSketch(Plane(origin=(-16.5393520653, 30.8992120032, 0), x_dir=(0, 0, 1), z_dir=(-0.4719154962, 0.8816437855, 0))):
        with BuildLine():
            ThreePointArc((2, 0.8807372995), (0.5857864376, 1.4665237371), (0, 2.8807372995))
            Line((0, 2.8807372995), (0, 0.8807372995))
            Line((0, 0.8807372995), (2, 0.8807372995))
        make_face()
    revolve(axis=Axis((-49.2653193466, 13.382056728, 0), (0, 0, -1)), revolution_arc=F3_T6_ANGLE)

    # F3_s7 → F3_t8 (intersect, symmetric)
    with BuildSketch(Plane.XY.offset(1.7)):
        with Locations((-36.3125860089, 36.1311304656)):
            Circle(F3_S7_R)
    extrude(amount=F3_T8_DEPTH, both=True, mode=Mode.INTERSECT)


with BuildPart() as f3_tool9:
    # F3_s10 → F3_t11 (revolve)
    with BuildSketch(Plane(origin=(1.5577759314, 1.7140787916, 0), x_dir=(0, 0, 1), z_dir=(0.6725599089, 0.7400426805, 0))):
        with BuildLine():
            ThreePointArc((2, -13.1732132997), (0.5857864376, -12.5874268621), (0, -11.1732132997))
            Line((0, -11.1732132997), (0, -13.1732132997))
            Line((0, -13.1732132997), (2, -13.1732132997))
        make_face()
    revolve(axis=Axis((-36.3125860089, 36.1311304656, 0), (0, 0, -1)), revolution_arc=F3_T11_ANGLE)

    # F3_s12 → F3_t13 (intersect, symmetric)
    with BuildSketch(Plane.XY.offset(1)):
        with Locations((-49.2653193466, 13.382056728)):
            Circle(F3_S12_R)
    extrude(amount=F3_T13_DEPTH, both=True, mode=Mode.INTERSECT)


with BuildPart() as f3_tool14:
    # F3_s15 → F3_t16 (revolve)
    with BuildSketch(Plane(origin=(-25.0397677731, -2.7372909551, 0), x_dir=(0, 0, 1), z_dir=(0.9940778417, 0.1086703483, 0))):
        with BuildLine():
            ThreePointArc((2, -2.8187794742), (0.5857864376, -2.2329930365), (0, -0.8187794742))
            Line((0, -0.8187794742), (0, -2.8187794742))
            Line((0, -2.8187794742), (2, -2.8187794742))
        make_face()
    revolve(axis=Axis((-23.845457228, -13.6624206496, 0), (0, 0, 1)), revolution_arc=F3_T16_ANGLE)


with BuildPart() as f3_tool17:
    # F3_s18 → F3_t19 (revolve)
    with BuildSketch(Plane(origin=(-18.4898265191, -29.7731050523, 0), x_dir=(0, 0, 1), z_dir=(-0.5275681672, -0.8495127009, 0))):
        with BuildLine():
            ThreePointArc((2, 0.8807372995), (0.5857864376, 1.4665237371), (0, 2.8807372995))
            Line((0, 2.8807372995), (0, 0.8807372995))
            Line((0, 0.8807372995), (2, 0.8807372995))
        make_face()
    revolve(axis=Axis((13.0434585919, -49.3560464437, 0), (0, 0, -1)), revolution_arc=F3_T19_ANGLE)

    # F3_s20 → F3_t21 (intersect, symmetric)
    with BuildSketch(Plane.XY.offset(1.7)):
        with Locations((-13.1341838462, -49.5131871936)):
            Circle(F3_S20_R)
    extrude(amount=F3_T21_DEPTH, both=True, mode=Mode.INTERSECT)


with BuildPart() as f3_tool22:
    # F3_s23 → F3_t24 (revolve)
    with BuildSketch(Plane(origin=(-2.2633237433, 0.4920341342, 0), x_dir=(0, 0, 1), z_dir=(-0.9771757156, 0.2124326264, 0))):
        with BuildLine():
            ThreePointArc((2, -13.1732132997), (0.5857864376, -12.5874268621), (0, -11.1732132997))
            Line((0, -11.1732132997), (0, -13.1732132997))
            Line((0, -13.1732132997), (2, -13.1732132997))
        make_face()
    revolve(axis=Axis((-13.1341838462, -49.5131871936, 0), (0, 0, -1)), revolution_arc=F3_T24_ANGLE)

    # F3_s25 → F3_t26 (intersect, symmetric)
    with BuildSketch(Plane.XY.offset(1.7)):
        with Locations((13.0434585919, -49.3560464437)):
            Circle(F3_S25_R)
    extrude(amount=F3_T26_DEPTH, both=True, mode=Mode.INTERSECT)


with BuildPart() as f3_tool27:
    # F3_s28 → F3_t29 (revolve)
    with BuildSketch(Plane(origin=(14.8904473912, -20.3164295188, 0), x_dir=(0, 0, 1), z_dir=(-0.5911502031, 0.8065614901, 0))):
        with BuildLine():
            ThreePointArc((2, -2.8187794742), (0.5857864376, -2.2329930365), (0, -0.8187794742))
            Line((0, -0.8187794742), (0, -2.8187794742))
            Line((0, -2.8187794742), (2, -2.8187794742))
        make_face()
    revolve(axis=Axis((23.7547319738, -13.8195613995, 0), (0, 0, 1)), revolution_arc=F3_T29_ANGLE)


with BuildPart() as f3_tool30:
    # F3_s31 → F3_t32 (revolve)
    with BuildSketch(Plane(origin=(35.0291785844, -1.1261069509, 0), x_dir=(0, 0, 1), z_dir=(0.9994836634, -0.0321310846, 0))):
        with BuildLine():
            ThreePointArc((2, 0.8807372995), (0.5857864376, 1.4665237371), (0, 2.8807372995))
            Line((0, 2.8807372995), (0, 0.8807372995))
            Line((0, 0.8807372995), (2, 0.8807372995))
        make_face()
    revolve(axis=Axis((36.2218607546, 35.9739897157, 0), (0, 0, -1)), revolution_arc=F3_T32_ANGLE)

    # F3_s33 → F3_t34 (intersect, symmetric)
    with BuildSketch(Plane.XY.offset(1.7)):
        with Locations((49.4467698551, 13.382056728)):
            Circle(F3_S33_R)
    extrude(amount=F3_T34_DEPTH, both=True, mode=Mode.INTERSECT)


with BuildPart() as f3_tool35:
    # F3_s36 → F3_t37 (revolve)
    with BuildSketch(Plane(origin=(0.7055478119, -2.2061129258, 0), x_dir=(0, 0, 1), z_dir=(0.3046158068, -0.9524753069, 0))):
        with BuildLine():
            ThreePointArc((2, -13.1732132997), (0.5857864376, -12.5874268621), (0, -11.1732132997))
            Line((0, -11.1732132997), (0, -13.1732132997))
            Line((0, -13.1732132997), (2, -13.1732132997))
        make_face()
    revolve(axis=Axis((49.4467698551, 13.382056728, 0), (0, 0, -1)), revolution_arc=F3_T37_ANGLE)

    # F3_s38 → F3_t39 (intersect, symmetric)
    with BuildSketch(Plane.XY.offset(1.7)):
        with Locations((36.2218607546, 35.9739897157)):
            Circle(F3_S38_R)
    extrude(amount=F3_T39_DEPTH, both=True, mode=Mode.INTERSECT)


with BuildPart() as f3_tool41:
    # F3_s42 → F3_t43 (revolve)
    with BuildSketch(Plane(origin=(1.5577759314, 1.7140787916, 0), x_dir=(0, 0, 1), z_dir=(0.6725599089, 0.7400426805, 0))):
        with BuildLine():
            ThreePointArc((2, -13.1732132997), (0.5857864376, -12.5874268621), (0, -11.1732132997))
            Line((0, -11.1732132997), (0, -13.1732132997))
            Line((0, -13.1732132997), (2, -13.1732132997))
        make_face()
    revolve(axis=Axis((-36.3125860089, 36.1311304656, 0), (0, 0, -1)), revolution_arc=F3_T43_ANGLE)

    # F3_s44 → F3_t45 (cut, symmetric)
    with BuildSketch(Plane.XY.offset(1)):
        with Locations((-49.2653193466, 13.382056728)):
            Circle(F3_S44_R)
    extrude(amount=F3_T45_DEPTH, both=True, mode=Mode.SUBTRACT)


with BuildPart() as f3_tool46:
    # F3_s47 → F3_t48 (revolve)
    with BuildSketch(Plane(origin=(-16.5393520653, 30.8992120032, 0), x_dir=(0, 0, 1), z_dir=(-0.4719154962, 0.8816437855, 0))):
        with BuildLine():
            ThreePointArc((2, 0.8807372995), (0.5857864376, 1.4665237371), (0, 2.8807372995))
            Line((0, 2.8807372995), (0, 0.8807372995))
            Line((0, 0.8807372995), (2, 0.8807372995))
        make_face()
    revolve(axis=Axis((-49.2653193466, 13.382056728, 0), (0, 0, -1)), revolution_arc=F3_T48_ANGLE)

    # F3_s49 → F3_t50 (cut, symmetric)
    with BuildSketch(Plane.XY.offset(1.7)):
        with Locations((-36.3125860089, 36.1311304656)):
            Circle(F3_S49_R)
    extrude(amount=F3_T50_DEPTH, both=True, mode=Mode.SUBTRACT)


with BuildPart() as f3_tool41_1:
    add(f3_tool41.part)

    # F3_t51: intersect F3_tool46
    add(f3_tool46.part, mode=Mode.INTERSECT)


with BuildPart() as f3_tool53:
    # F3_s54 → F3_t55 (revolve)
    with BuildSketch(Plane(origin=(-2.2633237433, 0.4920341342, 0), x_dir=(0, 0, 1), z_dir=(-0.9771757156, 0.2124326264, 0))):
        with BuildLine():
            ThreePointArc((2, -13.1732132997), (0.5857864376, -12.5874268621), (0, -11.1732132997))
            Line((0, -11.1732132997), (0, -13.1732132997))
            Line((0, -13.1732132997), (2, -13.1732132997))
        make_face()
    revolve(axis=Axis((-13.1341838462, -49.5131871936, 0), (0, 0, -1)), revolution_arc=F3_T55_ANGLE)

    # F3_s56 → F3_t57 (cut, symmetric)
    with BuildSketch(Plane.XY.offset(1.7)):
        with Locations((13.0434585919, -49.3560464437)):
            Circle(F3_S56_R)
    extrude(amount=F3_T57_DEPTH, both=True, mode=Mode.SUBTRACT)


with BuildPart() as f3_tool58:
    # F3_s59 → F3_t60 (revolve)
    with BuildSketch(Plane(origin=(-18.4898265191, -29.7731050523, 0), x_dir=(0, 0, 1), z_dir=(-0.5275681672, -0.8495127009, 0))):
        with BuildLine():
            ThreePointArc((2, 0.8807372995), (0.5857864376, 1.4665237371), (0, 2.8807372995))
            Line((0, 2.8807372995), (0, 0.8807372995))
            Line((0, 0.8807372995), (2, 0.8807372995))
        make_face()
    revolve(axis=Axis((13.0434585919, -49.3560464437, 0), (0, 0, -1)), revolution_arc=F3_T60_ANGLE)

    # F3_s61 → F3_t62 (cut, symmetric)
    with BuildSketch(Plane.XY.offset(1.7)):
        with Locations((-13.1341838462, -49.5131871936)):
            Circle(F3_S61_R)
    extrude(amount=F3_T62_DEPTH, both=True, mode=Mode.SUBTRACT)


with BuildPart() as f3_tool53_1:
    add(f3_tool53.part)

    # F3_t63: intersect F3_tool58
    add(f3_tool58.part, mode=Mode.INTERSECT)


with BuildPart() as f3_tool65:
    # F3_s66 → F3_t67 (revolve)
    with BuildSketch(Plane(origin=(0.7055478119, -2.2061129258, 0), x_dir=(0, 0, 1), z_dir=(0.3046158068, -0.9524753069, 0))):
        with BuildLine():
            ThreePointArc((2, -13.1732132997), (0.5857864376, -12.5874268621), (0, -11.1732132997))
            Line((0, -11.1732132997), (0, -13.1732132997))
            Line((0, -13.1732132997), (2, -13.1732132997))
        make_face()
    revolve(axis=Axis((49.4467698551, 13.382056728, 0), (0, 0, -1)), revolution_arc=F3_T67_ANGLE)

    # F3_s68 → F3_t69 (cut, symmetric)
    with BuildSketch(Plane.XY.offset(1.7)):
        with Locations((36.2218607546, 35.9739897157)):
            Circle(F3_S68_R)
    extrude(amount=F3_T69_DEPTH, both=True, mode=Mode.SUBTRACT)


with BuildPart() as f3_tool70:
    # F3_s71 → F3_t72 (revolve)
    with BuildSketch(Plane(origin=(35.0291785844, -1.1261069509, 0), x_dir=(0, 0, 1), z_dir=(0.9994836634, -0.0321310846, 0))):
        with BuildLine():
            ThreePointArc((2, 0.8807372995), (0.5857864376, 1.4665237371), (0, 2.8807372995))
            Line((0, 2.8807372995), (0, 0.8807372995))
            Line((0, 0.8807372995), (2, 0.8807372995))
        make_face()
    revolve(axis=Axis((36.2218607546, 35.9739897157, 0), (0, 0, -1)), revolution_arc=F3_T72_ANGLE)

    # F3_s73 → F3_t74 (cut, symmetric)
    with BuildSketch(Plane.XY.offset(1.7)):
        with Locations((49.4467698551, 13.382056728)):
            Circle(F3_S73_R)
    extrude(amount=F3_T74_DEPTH, both=True, mode=Mode.SUBTRACT)


with BuildPart() as f3_tool65_1:
    add(f3_tool65.part)

    # F3_t75: intersect F3_tool70
    add(f3_tool70.part, mode=Mode.INTERSECT)


with BuildPart() as f1_2:
    add(f1_1.part)

    # F3_t76: cut F3_tool1, F3_tool4, F3_tool9, F3_tool14, F3_tool17, F3_tool22, F3_tool27, F3_tool30, F3_tool35, F3_tool41, F3_tool53, F3_tool65
    add([f3_tool1.part, f3_tool4.part, f3_tool9.part, f3_tool14.part, f3_tool17.part, f3_tool22.part, f3_tool27.part, f3_tool30.part, f3_tool35.part, f3_tool41_1.part, f3_tool53_1.part, f3_tool65_1.part], mode=Mode.SUBTRACT)


solid = f1_2.part
